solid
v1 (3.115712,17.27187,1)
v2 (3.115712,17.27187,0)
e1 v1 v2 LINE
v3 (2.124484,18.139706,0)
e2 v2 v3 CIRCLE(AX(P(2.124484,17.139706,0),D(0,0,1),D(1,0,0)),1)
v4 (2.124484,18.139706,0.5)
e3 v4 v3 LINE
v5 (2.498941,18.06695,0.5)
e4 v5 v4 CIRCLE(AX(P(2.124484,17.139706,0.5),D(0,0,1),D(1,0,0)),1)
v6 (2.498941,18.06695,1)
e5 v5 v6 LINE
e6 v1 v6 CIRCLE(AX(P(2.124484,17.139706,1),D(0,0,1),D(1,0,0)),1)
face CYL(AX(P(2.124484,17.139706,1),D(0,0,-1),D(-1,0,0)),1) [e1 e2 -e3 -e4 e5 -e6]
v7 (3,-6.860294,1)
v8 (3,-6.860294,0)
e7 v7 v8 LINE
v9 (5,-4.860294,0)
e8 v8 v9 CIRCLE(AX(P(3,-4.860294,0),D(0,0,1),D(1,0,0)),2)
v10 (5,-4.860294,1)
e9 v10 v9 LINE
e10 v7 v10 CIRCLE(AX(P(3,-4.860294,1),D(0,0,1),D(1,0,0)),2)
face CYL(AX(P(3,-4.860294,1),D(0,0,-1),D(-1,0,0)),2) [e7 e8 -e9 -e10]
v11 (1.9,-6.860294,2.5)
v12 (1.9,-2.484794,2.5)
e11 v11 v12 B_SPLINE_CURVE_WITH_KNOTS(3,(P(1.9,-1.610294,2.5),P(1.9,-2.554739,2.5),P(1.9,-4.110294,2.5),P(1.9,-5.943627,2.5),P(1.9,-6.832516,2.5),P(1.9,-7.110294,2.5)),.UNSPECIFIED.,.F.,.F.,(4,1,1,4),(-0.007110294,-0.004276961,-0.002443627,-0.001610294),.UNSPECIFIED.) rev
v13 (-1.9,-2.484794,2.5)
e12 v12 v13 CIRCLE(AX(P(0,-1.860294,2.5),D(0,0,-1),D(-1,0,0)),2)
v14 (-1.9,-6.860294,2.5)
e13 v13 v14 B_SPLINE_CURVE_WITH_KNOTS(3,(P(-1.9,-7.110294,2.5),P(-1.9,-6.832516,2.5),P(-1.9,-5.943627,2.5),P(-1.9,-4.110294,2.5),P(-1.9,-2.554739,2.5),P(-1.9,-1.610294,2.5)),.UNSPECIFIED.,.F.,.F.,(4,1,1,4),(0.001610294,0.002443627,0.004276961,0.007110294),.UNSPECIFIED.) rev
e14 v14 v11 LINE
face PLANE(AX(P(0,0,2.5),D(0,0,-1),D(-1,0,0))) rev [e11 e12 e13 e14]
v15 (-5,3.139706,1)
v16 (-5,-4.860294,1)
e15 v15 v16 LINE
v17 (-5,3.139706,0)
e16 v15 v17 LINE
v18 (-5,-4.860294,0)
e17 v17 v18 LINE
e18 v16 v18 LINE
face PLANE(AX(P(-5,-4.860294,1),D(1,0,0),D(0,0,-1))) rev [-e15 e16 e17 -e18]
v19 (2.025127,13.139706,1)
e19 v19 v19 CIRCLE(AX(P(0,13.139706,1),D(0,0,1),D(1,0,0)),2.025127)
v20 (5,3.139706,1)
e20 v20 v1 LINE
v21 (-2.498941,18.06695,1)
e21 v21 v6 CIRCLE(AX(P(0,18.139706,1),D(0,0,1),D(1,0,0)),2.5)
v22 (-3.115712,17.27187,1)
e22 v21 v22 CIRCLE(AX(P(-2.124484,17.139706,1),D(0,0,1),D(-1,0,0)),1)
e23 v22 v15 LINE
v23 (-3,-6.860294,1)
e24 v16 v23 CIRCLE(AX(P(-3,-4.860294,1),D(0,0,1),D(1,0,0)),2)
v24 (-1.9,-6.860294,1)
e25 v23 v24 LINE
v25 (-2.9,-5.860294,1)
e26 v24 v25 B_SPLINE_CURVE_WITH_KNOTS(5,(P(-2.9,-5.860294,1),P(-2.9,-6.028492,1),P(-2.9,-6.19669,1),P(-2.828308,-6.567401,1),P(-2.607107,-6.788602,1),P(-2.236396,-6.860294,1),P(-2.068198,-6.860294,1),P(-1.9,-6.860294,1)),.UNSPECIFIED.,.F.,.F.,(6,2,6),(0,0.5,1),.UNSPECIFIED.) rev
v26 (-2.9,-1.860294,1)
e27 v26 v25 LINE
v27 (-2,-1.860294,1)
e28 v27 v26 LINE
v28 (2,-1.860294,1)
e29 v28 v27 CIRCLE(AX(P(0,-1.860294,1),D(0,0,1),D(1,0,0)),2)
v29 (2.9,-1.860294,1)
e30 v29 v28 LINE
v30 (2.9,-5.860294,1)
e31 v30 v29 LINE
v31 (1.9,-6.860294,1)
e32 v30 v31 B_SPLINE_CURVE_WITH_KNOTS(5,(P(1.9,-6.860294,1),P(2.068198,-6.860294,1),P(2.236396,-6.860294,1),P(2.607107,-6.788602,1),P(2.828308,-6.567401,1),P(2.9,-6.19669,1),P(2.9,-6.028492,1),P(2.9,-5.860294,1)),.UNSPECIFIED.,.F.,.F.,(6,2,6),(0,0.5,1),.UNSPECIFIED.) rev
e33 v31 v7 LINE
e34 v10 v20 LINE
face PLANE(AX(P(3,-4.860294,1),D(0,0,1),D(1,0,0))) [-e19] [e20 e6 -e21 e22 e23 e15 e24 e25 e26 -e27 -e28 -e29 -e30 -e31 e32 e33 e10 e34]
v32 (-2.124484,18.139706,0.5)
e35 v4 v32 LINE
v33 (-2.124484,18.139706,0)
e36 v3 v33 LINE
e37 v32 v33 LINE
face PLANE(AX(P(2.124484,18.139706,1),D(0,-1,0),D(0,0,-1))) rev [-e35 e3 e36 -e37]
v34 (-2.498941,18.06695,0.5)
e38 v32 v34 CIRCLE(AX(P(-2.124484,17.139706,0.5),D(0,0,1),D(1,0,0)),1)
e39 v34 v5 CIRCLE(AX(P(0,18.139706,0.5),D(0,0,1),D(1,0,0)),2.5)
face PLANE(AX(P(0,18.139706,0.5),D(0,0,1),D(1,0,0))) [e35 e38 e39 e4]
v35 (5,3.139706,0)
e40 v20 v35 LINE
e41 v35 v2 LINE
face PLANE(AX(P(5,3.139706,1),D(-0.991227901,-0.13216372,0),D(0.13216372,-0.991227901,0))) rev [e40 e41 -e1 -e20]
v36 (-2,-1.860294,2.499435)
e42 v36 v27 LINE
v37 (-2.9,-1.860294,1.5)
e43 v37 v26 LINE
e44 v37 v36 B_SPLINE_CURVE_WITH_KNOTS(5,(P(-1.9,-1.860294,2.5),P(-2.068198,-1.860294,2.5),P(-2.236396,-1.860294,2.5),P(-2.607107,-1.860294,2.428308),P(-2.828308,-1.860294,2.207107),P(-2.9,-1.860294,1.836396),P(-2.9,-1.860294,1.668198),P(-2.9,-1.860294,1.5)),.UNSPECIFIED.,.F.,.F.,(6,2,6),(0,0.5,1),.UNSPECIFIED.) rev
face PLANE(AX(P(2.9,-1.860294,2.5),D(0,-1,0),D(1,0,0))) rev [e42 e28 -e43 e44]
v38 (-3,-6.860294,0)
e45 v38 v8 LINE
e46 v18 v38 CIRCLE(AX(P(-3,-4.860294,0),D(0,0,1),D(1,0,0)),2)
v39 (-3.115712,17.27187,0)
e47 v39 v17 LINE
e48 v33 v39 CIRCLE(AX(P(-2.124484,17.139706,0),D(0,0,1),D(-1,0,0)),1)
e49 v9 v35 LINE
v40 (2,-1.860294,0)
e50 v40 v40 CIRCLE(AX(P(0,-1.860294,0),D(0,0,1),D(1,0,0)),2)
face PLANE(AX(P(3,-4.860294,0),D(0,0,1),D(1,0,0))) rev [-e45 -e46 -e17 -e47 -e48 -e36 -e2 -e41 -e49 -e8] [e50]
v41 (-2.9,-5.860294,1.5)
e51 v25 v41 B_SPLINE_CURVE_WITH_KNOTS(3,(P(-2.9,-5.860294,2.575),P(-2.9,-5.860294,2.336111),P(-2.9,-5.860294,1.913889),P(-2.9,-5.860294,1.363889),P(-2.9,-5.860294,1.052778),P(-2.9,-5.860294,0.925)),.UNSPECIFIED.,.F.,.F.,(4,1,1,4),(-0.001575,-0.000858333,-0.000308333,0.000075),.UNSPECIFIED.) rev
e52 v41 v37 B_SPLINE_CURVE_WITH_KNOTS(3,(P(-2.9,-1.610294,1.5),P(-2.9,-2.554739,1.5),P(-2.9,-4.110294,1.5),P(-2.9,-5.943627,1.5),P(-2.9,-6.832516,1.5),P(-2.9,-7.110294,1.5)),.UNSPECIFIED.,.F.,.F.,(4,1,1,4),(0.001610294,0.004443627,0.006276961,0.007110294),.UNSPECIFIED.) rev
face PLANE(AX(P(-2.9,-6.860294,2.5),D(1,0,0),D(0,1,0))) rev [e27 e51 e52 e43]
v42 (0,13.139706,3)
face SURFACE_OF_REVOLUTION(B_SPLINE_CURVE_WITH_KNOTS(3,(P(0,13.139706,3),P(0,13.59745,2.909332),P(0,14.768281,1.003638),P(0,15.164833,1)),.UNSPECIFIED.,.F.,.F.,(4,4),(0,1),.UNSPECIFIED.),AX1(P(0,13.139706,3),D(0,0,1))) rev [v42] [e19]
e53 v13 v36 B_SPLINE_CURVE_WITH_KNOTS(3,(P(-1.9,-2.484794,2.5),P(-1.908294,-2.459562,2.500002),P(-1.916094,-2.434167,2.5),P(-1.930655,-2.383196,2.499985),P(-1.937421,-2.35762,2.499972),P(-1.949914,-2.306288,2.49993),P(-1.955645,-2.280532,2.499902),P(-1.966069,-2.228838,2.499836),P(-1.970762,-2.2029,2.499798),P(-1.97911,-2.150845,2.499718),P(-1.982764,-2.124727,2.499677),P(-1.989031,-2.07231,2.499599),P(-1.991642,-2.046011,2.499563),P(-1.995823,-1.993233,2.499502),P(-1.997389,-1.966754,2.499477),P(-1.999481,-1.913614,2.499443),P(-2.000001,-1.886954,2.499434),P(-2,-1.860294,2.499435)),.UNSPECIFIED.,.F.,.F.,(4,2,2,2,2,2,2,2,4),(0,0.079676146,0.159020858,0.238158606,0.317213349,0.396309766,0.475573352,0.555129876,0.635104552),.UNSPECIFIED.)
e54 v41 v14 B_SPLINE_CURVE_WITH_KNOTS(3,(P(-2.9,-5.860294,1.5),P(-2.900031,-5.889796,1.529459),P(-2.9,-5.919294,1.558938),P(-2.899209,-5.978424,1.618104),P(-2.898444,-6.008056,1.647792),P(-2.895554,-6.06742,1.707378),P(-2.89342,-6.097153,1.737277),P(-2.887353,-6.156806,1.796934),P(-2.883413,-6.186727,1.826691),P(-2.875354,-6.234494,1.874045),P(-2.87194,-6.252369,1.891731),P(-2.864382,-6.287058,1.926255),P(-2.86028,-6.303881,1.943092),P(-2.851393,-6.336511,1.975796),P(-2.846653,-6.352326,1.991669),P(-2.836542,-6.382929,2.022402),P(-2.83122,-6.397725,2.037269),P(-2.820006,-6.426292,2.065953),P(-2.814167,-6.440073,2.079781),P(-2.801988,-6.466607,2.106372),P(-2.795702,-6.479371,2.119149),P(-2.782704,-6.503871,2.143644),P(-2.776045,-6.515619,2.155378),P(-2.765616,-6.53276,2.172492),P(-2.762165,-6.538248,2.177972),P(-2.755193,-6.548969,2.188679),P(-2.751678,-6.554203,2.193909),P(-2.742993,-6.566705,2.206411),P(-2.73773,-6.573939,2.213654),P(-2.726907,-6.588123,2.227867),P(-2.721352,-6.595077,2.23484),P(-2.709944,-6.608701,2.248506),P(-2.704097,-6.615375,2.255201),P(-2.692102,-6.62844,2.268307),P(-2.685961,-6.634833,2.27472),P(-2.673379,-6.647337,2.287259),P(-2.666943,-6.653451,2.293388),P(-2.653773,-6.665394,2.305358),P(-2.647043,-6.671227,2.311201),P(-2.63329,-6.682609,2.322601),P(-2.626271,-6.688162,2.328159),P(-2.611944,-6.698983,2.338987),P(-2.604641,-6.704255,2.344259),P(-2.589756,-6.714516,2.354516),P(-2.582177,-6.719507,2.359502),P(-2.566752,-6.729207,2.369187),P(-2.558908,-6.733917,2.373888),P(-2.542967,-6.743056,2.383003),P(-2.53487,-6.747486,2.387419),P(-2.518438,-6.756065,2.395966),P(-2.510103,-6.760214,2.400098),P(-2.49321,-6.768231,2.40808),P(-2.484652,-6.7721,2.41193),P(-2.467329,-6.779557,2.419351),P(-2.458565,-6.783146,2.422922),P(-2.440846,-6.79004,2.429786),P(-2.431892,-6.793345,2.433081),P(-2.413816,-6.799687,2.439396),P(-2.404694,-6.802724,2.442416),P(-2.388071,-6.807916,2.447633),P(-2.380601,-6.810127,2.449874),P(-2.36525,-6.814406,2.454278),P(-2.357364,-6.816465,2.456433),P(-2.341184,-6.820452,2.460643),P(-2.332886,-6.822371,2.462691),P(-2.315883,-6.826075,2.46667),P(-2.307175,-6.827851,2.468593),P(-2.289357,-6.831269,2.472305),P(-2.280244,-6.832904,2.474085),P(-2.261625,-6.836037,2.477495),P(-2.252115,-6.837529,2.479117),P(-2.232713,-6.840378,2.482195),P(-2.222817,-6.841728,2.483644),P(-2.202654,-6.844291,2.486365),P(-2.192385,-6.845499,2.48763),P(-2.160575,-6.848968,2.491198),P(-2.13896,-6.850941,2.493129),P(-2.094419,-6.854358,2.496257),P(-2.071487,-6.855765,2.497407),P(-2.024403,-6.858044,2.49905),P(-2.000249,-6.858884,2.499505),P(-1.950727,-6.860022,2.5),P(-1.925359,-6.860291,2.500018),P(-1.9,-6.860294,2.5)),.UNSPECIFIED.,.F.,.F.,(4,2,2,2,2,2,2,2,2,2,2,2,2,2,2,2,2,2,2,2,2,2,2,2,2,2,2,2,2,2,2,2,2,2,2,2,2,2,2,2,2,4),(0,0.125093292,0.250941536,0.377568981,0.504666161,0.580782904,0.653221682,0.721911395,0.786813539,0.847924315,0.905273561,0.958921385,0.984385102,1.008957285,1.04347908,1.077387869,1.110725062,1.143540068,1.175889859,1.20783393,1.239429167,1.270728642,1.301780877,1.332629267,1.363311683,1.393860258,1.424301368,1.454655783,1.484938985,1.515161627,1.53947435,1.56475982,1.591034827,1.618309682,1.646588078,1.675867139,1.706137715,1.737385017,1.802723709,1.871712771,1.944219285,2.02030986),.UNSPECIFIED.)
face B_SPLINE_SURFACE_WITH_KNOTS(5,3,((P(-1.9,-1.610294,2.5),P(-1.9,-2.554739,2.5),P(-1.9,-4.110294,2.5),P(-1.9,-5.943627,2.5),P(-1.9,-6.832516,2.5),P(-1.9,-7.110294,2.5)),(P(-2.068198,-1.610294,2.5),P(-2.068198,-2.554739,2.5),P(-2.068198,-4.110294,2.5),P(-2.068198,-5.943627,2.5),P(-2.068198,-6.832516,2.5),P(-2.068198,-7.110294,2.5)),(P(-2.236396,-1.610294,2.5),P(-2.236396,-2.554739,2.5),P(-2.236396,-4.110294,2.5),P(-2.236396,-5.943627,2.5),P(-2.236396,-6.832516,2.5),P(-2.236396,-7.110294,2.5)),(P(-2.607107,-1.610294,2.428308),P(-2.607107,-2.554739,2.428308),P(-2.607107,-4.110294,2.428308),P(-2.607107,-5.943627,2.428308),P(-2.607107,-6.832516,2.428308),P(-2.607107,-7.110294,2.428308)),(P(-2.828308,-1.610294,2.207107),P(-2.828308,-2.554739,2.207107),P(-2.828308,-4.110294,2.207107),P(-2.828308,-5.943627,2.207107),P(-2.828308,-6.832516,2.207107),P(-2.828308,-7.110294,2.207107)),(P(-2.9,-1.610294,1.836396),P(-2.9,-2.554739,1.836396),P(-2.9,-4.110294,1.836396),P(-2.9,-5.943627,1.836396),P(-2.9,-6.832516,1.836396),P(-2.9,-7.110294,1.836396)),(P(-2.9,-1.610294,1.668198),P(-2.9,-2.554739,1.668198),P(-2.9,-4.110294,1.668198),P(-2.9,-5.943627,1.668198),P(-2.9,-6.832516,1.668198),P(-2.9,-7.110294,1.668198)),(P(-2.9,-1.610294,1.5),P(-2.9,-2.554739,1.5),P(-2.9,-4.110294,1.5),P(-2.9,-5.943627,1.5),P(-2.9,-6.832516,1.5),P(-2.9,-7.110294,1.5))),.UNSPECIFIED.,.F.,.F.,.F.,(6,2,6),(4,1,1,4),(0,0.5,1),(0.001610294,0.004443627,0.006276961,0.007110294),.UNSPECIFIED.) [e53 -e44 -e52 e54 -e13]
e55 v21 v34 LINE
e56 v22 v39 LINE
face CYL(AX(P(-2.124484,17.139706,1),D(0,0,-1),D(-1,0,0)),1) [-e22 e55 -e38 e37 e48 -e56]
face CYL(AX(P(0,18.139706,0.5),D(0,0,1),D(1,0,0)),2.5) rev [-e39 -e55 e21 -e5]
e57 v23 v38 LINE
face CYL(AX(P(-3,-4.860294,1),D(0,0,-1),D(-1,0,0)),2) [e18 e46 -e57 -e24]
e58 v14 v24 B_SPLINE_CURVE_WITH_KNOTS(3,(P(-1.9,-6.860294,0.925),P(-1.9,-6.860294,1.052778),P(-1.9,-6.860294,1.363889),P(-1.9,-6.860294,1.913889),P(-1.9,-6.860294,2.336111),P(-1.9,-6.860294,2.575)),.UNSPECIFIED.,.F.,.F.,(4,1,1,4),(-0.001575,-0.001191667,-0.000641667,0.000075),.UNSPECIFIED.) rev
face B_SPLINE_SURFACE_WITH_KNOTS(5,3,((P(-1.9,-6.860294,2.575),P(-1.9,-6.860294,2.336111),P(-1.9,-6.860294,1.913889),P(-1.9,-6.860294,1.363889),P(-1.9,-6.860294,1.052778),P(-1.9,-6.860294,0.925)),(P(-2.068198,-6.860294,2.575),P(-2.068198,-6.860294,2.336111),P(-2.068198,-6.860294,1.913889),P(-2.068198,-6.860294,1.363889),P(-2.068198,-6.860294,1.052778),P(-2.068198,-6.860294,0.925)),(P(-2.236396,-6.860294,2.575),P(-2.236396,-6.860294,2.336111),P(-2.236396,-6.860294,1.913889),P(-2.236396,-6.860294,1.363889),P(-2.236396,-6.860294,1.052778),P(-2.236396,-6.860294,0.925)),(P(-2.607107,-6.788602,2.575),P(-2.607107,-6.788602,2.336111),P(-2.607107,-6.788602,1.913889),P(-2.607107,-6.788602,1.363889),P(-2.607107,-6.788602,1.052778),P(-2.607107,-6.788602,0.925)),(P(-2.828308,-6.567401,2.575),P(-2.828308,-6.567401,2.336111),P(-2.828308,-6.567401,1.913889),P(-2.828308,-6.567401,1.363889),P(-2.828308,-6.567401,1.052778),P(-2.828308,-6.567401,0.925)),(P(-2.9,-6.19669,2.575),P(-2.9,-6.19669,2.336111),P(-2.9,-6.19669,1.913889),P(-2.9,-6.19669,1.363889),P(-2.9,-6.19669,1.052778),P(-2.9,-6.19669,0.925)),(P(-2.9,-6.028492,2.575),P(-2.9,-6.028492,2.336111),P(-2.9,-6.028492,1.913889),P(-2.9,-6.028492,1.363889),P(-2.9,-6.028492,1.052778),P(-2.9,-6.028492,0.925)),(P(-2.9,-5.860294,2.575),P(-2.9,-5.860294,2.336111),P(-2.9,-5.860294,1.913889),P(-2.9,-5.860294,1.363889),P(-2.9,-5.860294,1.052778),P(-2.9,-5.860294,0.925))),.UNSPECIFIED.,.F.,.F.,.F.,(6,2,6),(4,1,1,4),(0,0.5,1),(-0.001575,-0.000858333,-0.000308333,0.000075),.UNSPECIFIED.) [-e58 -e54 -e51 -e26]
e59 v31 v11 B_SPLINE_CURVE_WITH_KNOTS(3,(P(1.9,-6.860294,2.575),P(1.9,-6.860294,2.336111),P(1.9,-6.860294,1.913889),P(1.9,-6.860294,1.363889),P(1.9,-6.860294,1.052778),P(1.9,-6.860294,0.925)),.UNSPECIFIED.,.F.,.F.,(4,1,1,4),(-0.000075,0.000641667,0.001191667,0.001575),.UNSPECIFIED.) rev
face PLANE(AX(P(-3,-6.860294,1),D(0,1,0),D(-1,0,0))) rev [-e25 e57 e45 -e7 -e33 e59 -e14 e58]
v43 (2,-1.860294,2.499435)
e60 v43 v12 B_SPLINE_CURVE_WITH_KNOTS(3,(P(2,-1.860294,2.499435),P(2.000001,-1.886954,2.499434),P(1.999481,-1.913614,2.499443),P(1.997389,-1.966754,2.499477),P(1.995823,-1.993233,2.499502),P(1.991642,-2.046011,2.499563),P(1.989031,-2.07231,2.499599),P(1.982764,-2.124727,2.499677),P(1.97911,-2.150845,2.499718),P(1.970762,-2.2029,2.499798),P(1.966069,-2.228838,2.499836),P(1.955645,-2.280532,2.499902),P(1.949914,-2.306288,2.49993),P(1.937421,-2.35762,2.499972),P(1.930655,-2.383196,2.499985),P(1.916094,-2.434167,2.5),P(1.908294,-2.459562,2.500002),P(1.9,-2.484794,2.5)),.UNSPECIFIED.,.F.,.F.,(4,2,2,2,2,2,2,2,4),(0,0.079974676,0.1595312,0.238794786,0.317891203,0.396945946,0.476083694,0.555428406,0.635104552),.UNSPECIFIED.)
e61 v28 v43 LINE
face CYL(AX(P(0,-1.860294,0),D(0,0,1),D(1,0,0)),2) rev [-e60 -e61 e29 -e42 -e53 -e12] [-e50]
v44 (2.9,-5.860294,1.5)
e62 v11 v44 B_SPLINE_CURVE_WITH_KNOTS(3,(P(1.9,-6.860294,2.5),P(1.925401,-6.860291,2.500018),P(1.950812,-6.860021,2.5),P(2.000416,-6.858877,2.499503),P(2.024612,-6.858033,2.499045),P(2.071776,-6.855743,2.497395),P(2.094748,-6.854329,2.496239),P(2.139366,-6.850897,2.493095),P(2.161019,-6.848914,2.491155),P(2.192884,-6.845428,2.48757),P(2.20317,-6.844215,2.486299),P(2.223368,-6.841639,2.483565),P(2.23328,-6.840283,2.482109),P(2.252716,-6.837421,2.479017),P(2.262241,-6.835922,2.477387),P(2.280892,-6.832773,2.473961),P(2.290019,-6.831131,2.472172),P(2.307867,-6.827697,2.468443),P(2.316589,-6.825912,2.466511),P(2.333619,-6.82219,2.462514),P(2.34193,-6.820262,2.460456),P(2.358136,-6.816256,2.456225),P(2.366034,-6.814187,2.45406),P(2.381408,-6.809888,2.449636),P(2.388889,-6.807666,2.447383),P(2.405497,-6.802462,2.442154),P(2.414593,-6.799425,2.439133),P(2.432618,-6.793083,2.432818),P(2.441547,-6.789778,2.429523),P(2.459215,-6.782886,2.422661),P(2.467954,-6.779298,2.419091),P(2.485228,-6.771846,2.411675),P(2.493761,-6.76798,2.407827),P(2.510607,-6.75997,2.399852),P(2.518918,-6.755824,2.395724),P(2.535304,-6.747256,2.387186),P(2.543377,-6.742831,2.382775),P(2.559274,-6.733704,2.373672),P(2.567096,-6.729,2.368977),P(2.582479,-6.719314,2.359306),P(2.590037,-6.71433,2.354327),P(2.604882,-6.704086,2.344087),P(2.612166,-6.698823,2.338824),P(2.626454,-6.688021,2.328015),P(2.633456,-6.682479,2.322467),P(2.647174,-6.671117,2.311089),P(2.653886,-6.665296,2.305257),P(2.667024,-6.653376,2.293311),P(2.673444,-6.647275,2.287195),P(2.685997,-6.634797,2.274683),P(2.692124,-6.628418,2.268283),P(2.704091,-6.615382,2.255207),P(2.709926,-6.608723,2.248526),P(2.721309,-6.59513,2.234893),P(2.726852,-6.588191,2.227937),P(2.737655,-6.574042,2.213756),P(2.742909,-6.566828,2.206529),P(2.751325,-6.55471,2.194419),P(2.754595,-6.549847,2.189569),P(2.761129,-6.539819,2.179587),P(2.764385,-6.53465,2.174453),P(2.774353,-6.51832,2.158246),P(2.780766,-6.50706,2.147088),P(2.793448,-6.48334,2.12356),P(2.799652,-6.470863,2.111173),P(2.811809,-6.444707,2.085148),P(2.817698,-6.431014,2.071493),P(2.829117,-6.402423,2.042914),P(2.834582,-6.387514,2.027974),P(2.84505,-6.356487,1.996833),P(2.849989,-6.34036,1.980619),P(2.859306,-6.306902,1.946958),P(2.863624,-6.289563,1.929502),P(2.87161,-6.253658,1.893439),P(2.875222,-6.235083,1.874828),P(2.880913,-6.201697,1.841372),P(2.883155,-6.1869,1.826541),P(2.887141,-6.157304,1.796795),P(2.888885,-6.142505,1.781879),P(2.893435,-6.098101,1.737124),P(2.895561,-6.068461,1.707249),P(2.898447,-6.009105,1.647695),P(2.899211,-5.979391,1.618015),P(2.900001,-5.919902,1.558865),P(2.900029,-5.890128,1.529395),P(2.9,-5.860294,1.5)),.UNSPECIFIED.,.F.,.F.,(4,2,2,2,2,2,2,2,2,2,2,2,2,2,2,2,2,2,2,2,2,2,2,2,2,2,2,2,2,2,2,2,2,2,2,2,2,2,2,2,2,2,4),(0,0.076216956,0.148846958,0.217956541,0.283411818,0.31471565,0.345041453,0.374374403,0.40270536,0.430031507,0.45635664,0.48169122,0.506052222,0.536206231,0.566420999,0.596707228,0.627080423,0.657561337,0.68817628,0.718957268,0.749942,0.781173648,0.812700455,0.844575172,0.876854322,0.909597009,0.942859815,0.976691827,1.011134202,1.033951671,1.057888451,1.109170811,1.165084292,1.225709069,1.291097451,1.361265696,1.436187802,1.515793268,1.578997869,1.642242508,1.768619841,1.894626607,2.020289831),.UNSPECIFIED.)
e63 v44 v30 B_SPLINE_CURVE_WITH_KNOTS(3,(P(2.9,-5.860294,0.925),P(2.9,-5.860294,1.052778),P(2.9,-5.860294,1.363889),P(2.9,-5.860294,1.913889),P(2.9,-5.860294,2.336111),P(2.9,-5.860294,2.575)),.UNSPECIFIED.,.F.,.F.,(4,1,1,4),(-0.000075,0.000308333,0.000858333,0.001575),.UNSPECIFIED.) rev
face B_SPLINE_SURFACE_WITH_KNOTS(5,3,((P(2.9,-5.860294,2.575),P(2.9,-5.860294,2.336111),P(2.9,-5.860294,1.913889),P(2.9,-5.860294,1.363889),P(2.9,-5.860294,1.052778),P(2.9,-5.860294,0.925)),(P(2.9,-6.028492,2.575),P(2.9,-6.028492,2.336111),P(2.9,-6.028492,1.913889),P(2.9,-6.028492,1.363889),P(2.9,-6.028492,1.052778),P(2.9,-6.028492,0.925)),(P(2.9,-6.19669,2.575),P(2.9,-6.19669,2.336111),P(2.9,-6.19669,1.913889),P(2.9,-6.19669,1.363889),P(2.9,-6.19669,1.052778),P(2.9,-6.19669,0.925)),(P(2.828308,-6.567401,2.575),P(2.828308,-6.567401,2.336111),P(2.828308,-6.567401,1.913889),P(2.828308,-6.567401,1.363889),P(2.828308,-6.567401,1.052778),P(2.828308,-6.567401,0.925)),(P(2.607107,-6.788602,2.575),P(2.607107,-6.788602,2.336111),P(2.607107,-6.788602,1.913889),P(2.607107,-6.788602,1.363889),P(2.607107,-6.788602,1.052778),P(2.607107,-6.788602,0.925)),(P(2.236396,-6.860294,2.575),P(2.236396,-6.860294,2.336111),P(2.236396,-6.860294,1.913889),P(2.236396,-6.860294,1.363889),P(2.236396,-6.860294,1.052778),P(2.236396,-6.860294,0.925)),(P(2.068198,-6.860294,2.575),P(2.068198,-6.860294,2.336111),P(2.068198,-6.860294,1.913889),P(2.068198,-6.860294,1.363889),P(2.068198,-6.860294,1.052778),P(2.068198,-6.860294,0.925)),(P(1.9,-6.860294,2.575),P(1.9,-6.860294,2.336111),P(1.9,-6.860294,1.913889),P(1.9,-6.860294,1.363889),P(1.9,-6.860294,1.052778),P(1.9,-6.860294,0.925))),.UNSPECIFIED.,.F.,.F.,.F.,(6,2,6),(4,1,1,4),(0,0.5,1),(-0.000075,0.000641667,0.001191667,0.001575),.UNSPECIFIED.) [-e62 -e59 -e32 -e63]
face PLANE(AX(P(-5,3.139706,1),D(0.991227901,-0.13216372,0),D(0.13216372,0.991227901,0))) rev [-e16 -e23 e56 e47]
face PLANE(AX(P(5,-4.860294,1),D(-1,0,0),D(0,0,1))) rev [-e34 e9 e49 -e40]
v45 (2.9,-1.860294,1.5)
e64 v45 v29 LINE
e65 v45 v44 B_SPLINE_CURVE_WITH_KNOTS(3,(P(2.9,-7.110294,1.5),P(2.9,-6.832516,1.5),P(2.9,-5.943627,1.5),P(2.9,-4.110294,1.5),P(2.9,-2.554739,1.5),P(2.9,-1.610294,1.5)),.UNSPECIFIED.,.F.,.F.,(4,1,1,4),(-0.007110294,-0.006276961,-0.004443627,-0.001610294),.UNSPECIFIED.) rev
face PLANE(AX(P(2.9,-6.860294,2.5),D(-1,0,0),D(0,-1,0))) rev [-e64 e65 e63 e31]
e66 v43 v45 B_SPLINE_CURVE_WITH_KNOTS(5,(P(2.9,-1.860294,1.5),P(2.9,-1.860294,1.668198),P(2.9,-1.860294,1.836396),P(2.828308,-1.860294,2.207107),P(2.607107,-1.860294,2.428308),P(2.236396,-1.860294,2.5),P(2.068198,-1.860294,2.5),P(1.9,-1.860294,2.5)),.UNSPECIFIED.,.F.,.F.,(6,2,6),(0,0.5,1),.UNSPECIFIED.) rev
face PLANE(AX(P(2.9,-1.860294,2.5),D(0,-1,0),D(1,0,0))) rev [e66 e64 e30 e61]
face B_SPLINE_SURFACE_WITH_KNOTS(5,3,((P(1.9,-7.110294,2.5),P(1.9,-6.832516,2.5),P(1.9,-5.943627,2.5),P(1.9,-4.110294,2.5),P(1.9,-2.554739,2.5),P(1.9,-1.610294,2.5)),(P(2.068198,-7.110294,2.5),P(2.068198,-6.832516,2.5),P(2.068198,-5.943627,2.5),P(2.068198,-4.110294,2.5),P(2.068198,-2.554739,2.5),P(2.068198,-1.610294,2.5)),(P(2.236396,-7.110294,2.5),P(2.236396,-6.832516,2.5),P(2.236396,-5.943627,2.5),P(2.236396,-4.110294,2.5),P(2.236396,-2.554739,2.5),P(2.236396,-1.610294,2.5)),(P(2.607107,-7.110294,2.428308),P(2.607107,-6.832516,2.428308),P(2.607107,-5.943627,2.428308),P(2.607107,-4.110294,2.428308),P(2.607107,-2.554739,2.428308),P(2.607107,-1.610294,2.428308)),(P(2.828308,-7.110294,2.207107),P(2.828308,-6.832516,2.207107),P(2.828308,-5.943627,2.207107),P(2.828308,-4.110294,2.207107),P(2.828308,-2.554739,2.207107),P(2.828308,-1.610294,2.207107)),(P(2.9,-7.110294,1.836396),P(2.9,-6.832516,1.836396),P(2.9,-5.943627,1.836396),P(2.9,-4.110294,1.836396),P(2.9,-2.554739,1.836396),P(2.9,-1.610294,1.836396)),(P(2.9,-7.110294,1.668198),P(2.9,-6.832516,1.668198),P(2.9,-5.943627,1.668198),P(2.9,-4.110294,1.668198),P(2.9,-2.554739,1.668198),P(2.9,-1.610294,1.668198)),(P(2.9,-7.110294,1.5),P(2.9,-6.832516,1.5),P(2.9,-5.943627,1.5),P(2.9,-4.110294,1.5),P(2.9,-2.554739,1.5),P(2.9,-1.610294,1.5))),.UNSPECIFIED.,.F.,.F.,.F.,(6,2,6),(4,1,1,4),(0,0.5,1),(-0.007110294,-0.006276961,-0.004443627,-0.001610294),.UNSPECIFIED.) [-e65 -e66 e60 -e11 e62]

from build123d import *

# Parameters (mm, degrees)
BOSS_EXTRUDE1_DEPTH     = 1
SKETCH4_W               = 5.8
SKETCH4_H               = 5
BOSS_EXTRUDE2_DEPTH     = 1.5
CUT_EXTRUDE2_DEPTH      = 19.875882218
CUT_EXTRUDE2_DEPTH_BACK = 19.875882218
SKETCH3_R               = 2
FILLET2_SIZE            = 1
SKETCH11_R              = 2.5
CUT_EXTRUDE4_DEPTH      = 0.5


with BuildPart() as part:
    # Sketch1 → Boss-Extrude1 (new body)
    with BuildSketch(Plane.XY):
        with BuildLine():
            Line((-3, -6.860294118), (3, -6.860294118))
            ThreePointArc((3, -6.860294118), (4.414213562, -6.27450768), (5, -4.860294118))
            Line((5, -4.860294118), (5, 3.139705882))
            Line((5, 3.139705882), (3.115711504, 17.271869602))
            ThreePointArc((3.115711504, 17.271869602), (2.783208235, 17.89209), (2.124483603, 18.139705882))
            Line((2.124483603, 18.139705882), (-2.124483603, 18.139705882))
            ThreePointArc((-2.124483603, 18.139705882), (-2.783208235, 17.89209), (-3.115711504, 17.271869602))
            Line((-3.115711504, 17.271869602), (-5, 3.139705882))
            Line((-5, 3.139705882), (-5, -4.860294118))
            ThreePointArc((-5, -4.860294118), (-4.414213562, -6.27450768), (-3, -6.860294118))
        make_face()
    extrude(amount=BOSS_EXTRUDE1_DEPTH)

    # Sketch4 → Boss-Extrude2 (add)
    with BuildSketch(Plane.XY.offset(1)):
        with Locations((0, -4.360294118)):
            Rectangle(SKETCH4_W, SKETCH4_H)
    extrude(amount=BOSS_EXTRUDE2_DEPTH)

    # Sketch3 → Cut-Extrude2 (cut, two sides: drawn at the far end of the back side and taken through both)
    with BuildSketch(Plane.XY.offset(1).offset(-CUT_EXTRUDE2_DEPTH_BACK)):
        with Locations((0, -1.860294118)):
            Circle(SKETCH3_R)
    extrude(amount=CUT_EXTRUDE2_DEPTH + CUT_EXTRUDE2_DEPTH_BACK, mode=Mode.SUBTRACT)

    # Sketch10 → Revolve1 (revolve)
    with BuildSketch(Plane.ZY):
        with BuildLine():
            Line((3, 13.139705882), (1, 13.139705882))
            Line((1, 13.139705882), (1, 15.164832594))
            add(Edge.make_bspline(
                [(1, 15.164832594), (1.003638123, 14.768281169), (2.909332007, 13.597450134), (3, 13.139705882)],
                knots=[0, 0, 0, 0, 1, 1, 1, 1], degree=3))
        make_face()
    revolve(axis=Axis((0, 13.139705882, 3), (0, 0, -1)))

    # Fillet2
    # a fillet whose section is not a circle: 1 mm, written as the material it takes off along each edge
    with BuildSketch(Plane(origin=(2.9, -9.360294118, 2.5), x_dir=(0, 0, -1), z_dir=(0, 1, 0)), Plane(origin=(-2.9, 0.639705882, 2.5), x_dir=(0, 0, -1), z_dir=(0, -1, 0))) as fillet2_piece_1:
        with BuildLine():
            add(Edge.make_bspline([(FILLET2_SIZE, 0), (FILLET2_SIZE * 0.831801948466, 0), (FILLET2_SIZE * 0.663603896932, 0), (FILLET2_SIZE * 0.292893218813, FILLET2_SIZE * 0.0716919198361), (FILLET2_SIZE * 0.0716919198361, FILLET2_SIZE * 0.292893218813), (0, FILLET2_SIZE * 0.663603896932), (0, FILLET2_SIZE * 0.831801948466), (0, FILLET2_SIZE)], knots=[0, 0, 0, 0, 0, 0, 0.5, 0.5, 1, 1, 1, 1, 1, 1], degree=5))
            Line((0, FILLET2_SIZE), (0, 0))
            Line((0, 0), (FILLET2_SIZE, 0))
        make_face()
    fillet2_piece_1_solid = extrude(amount=10, mode=Mode.PRIVATE)
    with BuildSketch(Plane(origin=(2.9, -6.860294118, 1), x_dir=(-1, 0, 0), z_dir=(0, 0, 1))) as fillet2_piece_2:
        with BuildLine():
            add(Edge.make_bspline([(FILLET2_SIZE, 0), (FILLET2_SIZE * 0.831801948466, 0), (FILLET2_SIZE * 0.663603896932, 0), (FILLET2_SIZE * 0.292893218813, -FILLET2_SIZE * 0.0716919198361), (FILLET2_SIZE * 0.0716919198361, -FILLET2_SIZE * 0.292893218813), (0, -FILLET2_SIZE * 0.663603896932), (0, -FILLET2_SIZE * 0.831801948466), (0, -FILLET2_SIZE)], knots=[0, 0, 0, 0, 0, 0, 0.5, 0.5, 1, 1, 1, 1, 1, 1], degree=5))
            Line((0, -FILLET2_SIZE), (0, 0))
            Line((0, 0), (FILLET2_SIZE, 0))
        make_face()
    fillet2_piece_2_solid = extrude(amount=4, mode=Mode.PRIVATE)
    with BuildSketch(Plane(origin=(-2.9, -6.860294118, 1), x_dir=(1, 0, 0), z_dir=(0, 0, 1))) as fillet2_piece_3:
        with BuildLine():
            add(Edge.make_bspline([(FILLET2_SIZE, 0), (FILLET2_SIZE * 0.831801948466, 0), (FILLET2_SIZE * 0.663603896932, 0), (FILLET2_SIZE * 0.292893218813, FILLET2_SIZE * 0.0716919198361), (FILLET2_SIZE * 0.0716919198361, FILLET2_SIZE * 0.292893218813), (0, FILLET2_SIZE * 0.663603896932), (0, FILLET2_SIZE * 0.831801948466), (0, FILLET2_SIZE)], knots=[0, 0, 0, 0, 0, 0, 0.5, 0.5, 1, 1, 1, 1, 1, 1], degree=5))
            Line((0, FILLET2_SIZE), (0, 0))
            Line((0, 0), (FILLET2_SIZE, 0))
        make_face()
    fillet2_piece_3_solid = extrude(amount=4, mode=Mode.PRIVATE)
    add([fillet2_piece_1_solid, fillet2_piece_2_solid, fillet2_piece_3_solid], mode=Mode.SUBTRACT)

    # Sketch11 → Cut-Extrude4 (cut)
    with BuildSketch(Plane.XY.offset(1)):
        with Locations((0, 18.139705882)):
            Circle(SKETCH11_R)
    extrude(amount=-CUT_EXTRUDE4_DEPTH, mode=Mode.SUBTRACT)


solid = part.part
